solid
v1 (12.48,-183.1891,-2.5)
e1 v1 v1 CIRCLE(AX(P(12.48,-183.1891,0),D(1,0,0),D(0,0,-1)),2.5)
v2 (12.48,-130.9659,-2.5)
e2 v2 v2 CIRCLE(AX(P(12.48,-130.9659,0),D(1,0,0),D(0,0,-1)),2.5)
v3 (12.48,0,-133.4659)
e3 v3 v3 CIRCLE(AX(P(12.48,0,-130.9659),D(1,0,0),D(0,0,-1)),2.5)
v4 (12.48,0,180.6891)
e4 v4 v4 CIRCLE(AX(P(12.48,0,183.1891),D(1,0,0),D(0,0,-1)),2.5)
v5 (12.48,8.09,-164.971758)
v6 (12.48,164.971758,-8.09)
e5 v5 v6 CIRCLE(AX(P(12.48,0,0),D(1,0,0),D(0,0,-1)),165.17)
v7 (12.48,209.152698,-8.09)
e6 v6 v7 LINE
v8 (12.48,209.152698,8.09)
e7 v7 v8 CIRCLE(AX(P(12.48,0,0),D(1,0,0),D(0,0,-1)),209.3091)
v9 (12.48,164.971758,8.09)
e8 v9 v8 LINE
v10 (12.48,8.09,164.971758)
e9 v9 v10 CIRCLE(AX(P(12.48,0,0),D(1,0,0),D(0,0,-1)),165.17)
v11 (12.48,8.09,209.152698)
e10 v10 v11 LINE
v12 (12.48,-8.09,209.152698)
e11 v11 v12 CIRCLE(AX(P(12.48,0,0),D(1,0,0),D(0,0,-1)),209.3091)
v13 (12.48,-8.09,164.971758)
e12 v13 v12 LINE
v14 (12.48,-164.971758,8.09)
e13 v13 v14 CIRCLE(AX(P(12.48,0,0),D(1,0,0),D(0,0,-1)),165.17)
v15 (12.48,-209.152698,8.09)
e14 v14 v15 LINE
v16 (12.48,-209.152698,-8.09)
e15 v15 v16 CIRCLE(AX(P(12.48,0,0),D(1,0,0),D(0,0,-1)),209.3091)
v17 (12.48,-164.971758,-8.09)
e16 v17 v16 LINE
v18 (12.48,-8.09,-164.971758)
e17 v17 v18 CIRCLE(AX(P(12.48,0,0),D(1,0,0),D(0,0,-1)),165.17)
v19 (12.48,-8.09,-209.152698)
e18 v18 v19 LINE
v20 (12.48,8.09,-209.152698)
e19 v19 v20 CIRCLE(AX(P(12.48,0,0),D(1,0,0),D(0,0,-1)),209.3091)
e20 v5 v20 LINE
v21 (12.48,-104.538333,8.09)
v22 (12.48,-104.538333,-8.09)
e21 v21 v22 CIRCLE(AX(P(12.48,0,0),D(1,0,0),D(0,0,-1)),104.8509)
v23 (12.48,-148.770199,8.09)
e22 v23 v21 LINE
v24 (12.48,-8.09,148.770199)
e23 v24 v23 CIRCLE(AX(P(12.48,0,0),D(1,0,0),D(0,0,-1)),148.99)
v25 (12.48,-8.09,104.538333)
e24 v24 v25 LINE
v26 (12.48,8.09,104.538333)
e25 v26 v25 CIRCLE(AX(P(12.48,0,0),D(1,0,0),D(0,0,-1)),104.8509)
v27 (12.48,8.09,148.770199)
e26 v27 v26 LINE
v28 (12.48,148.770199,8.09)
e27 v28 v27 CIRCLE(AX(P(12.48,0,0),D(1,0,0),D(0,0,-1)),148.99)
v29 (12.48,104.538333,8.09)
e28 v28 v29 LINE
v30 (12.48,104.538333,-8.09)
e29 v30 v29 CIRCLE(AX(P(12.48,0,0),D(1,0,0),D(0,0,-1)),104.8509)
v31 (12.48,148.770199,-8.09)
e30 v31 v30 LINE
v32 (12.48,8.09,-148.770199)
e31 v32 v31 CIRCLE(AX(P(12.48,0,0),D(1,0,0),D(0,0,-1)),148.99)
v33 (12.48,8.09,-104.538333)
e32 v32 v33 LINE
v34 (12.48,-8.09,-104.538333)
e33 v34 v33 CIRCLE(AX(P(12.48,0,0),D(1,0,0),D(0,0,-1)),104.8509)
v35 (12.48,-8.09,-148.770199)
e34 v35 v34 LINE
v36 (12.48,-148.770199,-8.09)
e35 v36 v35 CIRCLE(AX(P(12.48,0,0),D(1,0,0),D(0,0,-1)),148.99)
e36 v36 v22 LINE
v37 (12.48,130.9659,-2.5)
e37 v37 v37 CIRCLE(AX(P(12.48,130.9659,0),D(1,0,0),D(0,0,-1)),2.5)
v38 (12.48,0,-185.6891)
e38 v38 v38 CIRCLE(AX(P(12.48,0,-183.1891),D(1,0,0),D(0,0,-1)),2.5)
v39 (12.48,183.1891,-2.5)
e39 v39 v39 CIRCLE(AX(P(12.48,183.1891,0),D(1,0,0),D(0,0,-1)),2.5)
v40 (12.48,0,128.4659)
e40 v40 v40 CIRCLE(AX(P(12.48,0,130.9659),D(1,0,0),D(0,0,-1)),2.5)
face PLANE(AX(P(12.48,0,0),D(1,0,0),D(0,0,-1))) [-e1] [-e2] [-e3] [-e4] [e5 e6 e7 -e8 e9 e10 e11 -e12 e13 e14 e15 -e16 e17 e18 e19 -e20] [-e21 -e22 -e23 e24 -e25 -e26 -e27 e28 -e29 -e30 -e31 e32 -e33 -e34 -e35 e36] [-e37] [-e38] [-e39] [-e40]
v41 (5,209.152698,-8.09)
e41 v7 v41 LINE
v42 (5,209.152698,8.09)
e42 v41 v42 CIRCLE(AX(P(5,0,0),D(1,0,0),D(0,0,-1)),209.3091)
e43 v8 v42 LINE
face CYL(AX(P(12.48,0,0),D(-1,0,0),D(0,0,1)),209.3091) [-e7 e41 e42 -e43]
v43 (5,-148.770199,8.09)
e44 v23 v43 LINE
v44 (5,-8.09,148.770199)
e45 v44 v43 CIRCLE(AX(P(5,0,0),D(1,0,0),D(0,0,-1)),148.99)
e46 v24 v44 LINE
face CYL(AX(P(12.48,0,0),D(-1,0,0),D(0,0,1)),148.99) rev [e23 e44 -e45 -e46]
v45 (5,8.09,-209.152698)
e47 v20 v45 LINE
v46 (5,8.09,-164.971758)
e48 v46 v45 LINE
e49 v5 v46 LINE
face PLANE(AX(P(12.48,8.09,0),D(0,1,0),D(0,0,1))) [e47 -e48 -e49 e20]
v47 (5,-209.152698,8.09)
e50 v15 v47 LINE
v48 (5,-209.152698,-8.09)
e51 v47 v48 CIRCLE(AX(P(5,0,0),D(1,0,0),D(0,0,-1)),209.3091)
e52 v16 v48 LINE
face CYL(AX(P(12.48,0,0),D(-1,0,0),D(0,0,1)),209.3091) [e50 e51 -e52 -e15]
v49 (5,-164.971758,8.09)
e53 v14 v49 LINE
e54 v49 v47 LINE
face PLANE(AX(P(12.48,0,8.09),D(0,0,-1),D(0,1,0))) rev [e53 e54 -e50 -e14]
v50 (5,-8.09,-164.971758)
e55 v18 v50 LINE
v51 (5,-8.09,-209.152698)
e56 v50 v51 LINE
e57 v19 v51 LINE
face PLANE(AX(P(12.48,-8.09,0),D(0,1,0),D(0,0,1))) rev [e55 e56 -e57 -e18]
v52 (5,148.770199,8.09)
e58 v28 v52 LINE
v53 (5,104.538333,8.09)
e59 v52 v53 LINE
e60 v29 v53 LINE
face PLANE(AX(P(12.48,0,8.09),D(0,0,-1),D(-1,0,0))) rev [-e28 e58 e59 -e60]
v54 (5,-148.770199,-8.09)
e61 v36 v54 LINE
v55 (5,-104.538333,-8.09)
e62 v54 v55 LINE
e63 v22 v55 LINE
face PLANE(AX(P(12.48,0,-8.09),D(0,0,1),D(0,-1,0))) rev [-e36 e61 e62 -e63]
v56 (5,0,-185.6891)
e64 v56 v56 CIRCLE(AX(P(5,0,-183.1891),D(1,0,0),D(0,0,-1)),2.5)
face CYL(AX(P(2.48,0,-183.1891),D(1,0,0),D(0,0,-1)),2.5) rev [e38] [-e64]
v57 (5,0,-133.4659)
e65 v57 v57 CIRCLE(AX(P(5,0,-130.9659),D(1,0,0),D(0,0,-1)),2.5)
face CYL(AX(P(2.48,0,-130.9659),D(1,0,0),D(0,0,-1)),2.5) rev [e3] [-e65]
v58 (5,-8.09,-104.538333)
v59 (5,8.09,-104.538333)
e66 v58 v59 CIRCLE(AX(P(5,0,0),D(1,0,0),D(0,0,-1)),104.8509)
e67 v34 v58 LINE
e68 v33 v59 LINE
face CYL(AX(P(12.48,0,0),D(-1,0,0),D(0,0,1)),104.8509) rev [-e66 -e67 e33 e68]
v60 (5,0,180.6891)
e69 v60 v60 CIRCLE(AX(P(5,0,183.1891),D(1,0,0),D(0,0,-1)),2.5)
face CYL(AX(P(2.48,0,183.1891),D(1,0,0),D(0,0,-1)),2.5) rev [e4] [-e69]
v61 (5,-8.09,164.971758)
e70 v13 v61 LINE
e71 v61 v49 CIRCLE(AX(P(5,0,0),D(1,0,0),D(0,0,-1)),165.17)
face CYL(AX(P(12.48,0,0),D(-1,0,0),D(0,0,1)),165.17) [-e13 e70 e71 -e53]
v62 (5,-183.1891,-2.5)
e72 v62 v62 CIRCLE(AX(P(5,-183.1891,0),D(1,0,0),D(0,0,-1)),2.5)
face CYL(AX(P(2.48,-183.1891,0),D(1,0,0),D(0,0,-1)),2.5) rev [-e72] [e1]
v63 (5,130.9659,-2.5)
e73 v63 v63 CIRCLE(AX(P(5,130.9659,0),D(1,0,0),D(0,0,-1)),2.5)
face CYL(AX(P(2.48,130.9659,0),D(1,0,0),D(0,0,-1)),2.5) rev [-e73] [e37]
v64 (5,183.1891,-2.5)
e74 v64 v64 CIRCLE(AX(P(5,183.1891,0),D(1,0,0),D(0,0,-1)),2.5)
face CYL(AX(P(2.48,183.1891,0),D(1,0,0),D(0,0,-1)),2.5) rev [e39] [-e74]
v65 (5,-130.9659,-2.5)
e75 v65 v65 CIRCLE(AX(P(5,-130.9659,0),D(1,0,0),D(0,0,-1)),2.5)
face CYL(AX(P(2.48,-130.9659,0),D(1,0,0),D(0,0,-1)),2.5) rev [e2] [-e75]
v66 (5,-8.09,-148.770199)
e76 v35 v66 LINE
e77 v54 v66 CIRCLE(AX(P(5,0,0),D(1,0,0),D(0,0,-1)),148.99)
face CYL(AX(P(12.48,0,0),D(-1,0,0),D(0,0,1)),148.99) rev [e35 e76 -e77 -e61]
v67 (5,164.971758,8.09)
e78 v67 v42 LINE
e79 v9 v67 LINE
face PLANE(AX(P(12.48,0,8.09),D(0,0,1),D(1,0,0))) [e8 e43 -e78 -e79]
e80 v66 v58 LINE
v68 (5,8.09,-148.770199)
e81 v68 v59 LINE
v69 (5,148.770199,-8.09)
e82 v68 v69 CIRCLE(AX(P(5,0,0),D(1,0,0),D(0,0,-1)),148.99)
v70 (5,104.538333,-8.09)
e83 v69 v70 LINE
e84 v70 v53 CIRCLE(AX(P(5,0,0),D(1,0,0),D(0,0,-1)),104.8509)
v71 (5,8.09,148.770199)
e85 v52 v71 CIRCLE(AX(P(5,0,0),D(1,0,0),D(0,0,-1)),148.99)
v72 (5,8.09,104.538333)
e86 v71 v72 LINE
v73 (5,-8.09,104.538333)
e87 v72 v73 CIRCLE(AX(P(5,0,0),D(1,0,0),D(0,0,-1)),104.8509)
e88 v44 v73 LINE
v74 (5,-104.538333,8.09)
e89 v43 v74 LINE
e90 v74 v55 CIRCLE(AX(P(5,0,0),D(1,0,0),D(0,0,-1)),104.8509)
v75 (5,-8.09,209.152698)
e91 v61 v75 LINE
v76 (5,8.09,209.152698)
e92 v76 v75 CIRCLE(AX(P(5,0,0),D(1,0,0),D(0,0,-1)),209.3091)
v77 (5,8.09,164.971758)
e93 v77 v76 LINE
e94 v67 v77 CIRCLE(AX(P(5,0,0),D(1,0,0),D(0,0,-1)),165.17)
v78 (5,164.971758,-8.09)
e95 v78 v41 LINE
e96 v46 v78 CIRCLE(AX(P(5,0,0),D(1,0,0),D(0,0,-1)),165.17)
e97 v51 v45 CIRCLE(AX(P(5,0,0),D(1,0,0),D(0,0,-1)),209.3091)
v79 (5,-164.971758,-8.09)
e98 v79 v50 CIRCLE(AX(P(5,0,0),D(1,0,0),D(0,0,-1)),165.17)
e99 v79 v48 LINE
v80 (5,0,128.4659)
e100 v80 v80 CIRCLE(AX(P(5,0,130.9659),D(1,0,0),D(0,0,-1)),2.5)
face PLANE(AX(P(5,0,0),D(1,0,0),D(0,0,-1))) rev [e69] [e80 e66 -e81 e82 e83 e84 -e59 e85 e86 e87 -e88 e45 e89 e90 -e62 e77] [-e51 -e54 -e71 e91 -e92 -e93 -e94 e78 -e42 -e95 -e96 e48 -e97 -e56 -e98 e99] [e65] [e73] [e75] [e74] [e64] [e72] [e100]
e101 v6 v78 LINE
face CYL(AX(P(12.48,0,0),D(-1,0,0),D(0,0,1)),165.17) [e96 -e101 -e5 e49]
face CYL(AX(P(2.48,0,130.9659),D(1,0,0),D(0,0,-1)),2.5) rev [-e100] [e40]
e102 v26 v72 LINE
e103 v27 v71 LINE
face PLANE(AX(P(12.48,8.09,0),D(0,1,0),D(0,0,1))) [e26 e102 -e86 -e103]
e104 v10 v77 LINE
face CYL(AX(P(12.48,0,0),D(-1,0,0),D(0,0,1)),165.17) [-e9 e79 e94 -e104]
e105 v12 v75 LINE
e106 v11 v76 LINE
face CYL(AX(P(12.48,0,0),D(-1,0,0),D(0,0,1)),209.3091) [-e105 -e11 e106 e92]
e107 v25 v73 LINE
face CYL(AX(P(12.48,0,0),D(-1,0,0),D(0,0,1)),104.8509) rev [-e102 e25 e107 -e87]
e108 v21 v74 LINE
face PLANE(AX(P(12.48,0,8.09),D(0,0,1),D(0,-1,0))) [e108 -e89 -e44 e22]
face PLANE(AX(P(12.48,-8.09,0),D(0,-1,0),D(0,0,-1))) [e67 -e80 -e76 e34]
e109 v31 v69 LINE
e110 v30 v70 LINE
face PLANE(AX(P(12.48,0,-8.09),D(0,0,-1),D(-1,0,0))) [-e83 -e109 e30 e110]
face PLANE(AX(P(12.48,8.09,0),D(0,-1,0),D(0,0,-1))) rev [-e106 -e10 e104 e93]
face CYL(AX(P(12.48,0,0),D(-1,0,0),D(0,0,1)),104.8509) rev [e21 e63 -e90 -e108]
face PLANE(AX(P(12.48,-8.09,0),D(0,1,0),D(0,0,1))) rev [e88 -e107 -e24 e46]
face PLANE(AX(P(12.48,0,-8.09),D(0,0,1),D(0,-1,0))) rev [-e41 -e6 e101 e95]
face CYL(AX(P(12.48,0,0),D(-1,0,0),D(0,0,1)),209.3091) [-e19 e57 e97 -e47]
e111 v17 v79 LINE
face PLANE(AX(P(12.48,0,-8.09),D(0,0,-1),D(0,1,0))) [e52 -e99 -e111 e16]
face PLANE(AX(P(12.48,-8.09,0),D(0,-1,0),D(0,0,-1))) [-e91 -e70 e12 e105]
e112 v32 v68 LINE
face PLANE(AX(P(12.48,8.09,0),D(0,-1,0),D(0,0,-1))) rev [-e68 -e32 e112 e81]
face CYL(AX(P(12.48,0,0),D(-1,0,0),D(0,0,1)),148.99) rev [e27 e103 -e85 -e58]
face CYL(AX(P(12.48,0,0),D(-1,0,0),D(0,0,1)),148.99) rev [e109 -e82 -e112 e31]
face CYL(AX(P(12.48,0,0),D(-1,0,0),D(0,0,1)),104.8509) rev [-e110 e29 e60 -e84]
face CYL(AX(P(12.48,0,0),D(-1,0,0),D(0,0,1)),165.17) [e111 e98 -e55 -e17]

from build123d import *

# Parameters (mm, degrees)
SKETCH1_W           = 450
SKETCH1_H           = 450
BOSS_EXTRUDE1_DEPTH = 5
BOSS_EXTRUDE2_DEPTH = 7.48
BOSS_EXTRUDE3_DEPTH = 7.48
SKETCH6_W           = 450
SKETCH6_H           = 450
CUT_EXTRUDE1_DEPTH  = 5
SKETCH7_R           = 11
SKETCH7_R_2         = 2.5
CUT_EXTRUDE2_DEPTH  = 10
SKETCH8_R           = 2.5
CUT_EXTRUDE4_DEPTH  = 10


# Read off the part's stored shape, not the designer's step: Boss-Extrude2
with BuildPart() as part:
    # Sketch1 → Boss-Extrude1 (new body)
    with BuildSketch(Plane(origin=(0, 0, 0), x_dir=(0, 0, -1), z_dir=(1, 0, 0))):
        Rectangle(SKETCH1_W, SKETCH1_H)
    extrude(amount=BOSS_EXTRUDE1_DEPTH)

    # Boss-Extrude2 outline → Boss-Extrude2 (add)
    with BuildSketch(Plane(origin=(5, 0, 0), x_dir=(0, 0, -1), z_dir=(1, 0, 0))):
        with BuildLine():
            Line((-164.971757583, 8.09), (-209.152698388, 8.09))
            ThreePointArc((-209.152698388, 8.09), (-209.3091, 0), (-209.152698388, -8.09))
            Line((-209.152698388, -8.09), (-164.971757583, -8.09))
            ThreePointArc((-164.971757583, -8.09), (-116.792827049, -116.792827049), (-8.09, -164.971757583))
            Line((-8.09, -164.971757583), (-8.09, -209.152698388))
            ThreePointArc((-8.09, -209.152698388), (0, -209.3091), (8.09, -209.152698388))
            Line((8.09, -209.152698388), (8.09, -164.971757583))
            ThreePointArc((8.09, -164.971757583), (116.792827049, -116.792827049), (164.971757583, -8.09))
            Line((164.971757583, -8.09), (209.152698388, -8.09))
            ThreePointArc((209.152698388, -8.09), (209.3091, 0), (209.152698388, 8.09))
            Line((209.152698388, 8.09), (164.971757583, 8.09))
            ThreePointArc((164.971757583, 8.09), (116.792827049, 116.792827049), (8.09, 164.971757583))
            Line((8.09, 164.971757583), (8.09, 209.152698388))
            ThreePointArc((8.09, 209.152698388), (0, 209.3091), (-8.09, 209.152698388))
            Line((-8.09, 209.152698388), (-8.09, 164.971757583))
            ThreePointArc((-8.09, 164.971757583), (-116.792827049, 116.792827049), (-164.971757583, 8.09))
        make_face()
        with BuildLine():
            Line((148.770198629, 8.09), (104.538333308, 8.09))
            ThreePointArc((104.538333308, 8.09), (104.8509, 0), (104.538333308, -8.09))
            Line((104.538333308, -8.09), (148.770198629, -8.09))
            ThreePointArc((148.770198629, -8.09), (105.351839329, -105.351839329), (8.09, -148.770198629))
            Line((8.09, -148.770198629), (8.09, -104.538333308))
            ThreePointArc((8.09, -104.538333308), (0, -104.8509), (-8.09, -104.538333308))
            Line((-8.09, -104.538333308), (-8.09, -148.770198629))
            ThreePointArc((-8.09, -148.770198629), (-105.351839329, -105.351839329), (-148.770198629, -8.09))
            Line((-148.770198629, -8.09), (-104.538333308, -8.09))
            ThreePointArc((-104.538333308, -8.09), (-104.8509, 0), (-104.538333308, 8.09))
            Line((-104.538333308, 8.09), (-148.770198629, 8.09))
            ThreePointArc((-148.770198629, 8.09), (-105.351839329, 105.351839329), (-8.09, 148.770198629))
            Line((-8.09, 148.770198629), (-8.09, 104.538333308))
            ThreePointArc((-8.09, 104.538333308), (0, 104.8509), (8.09, 104.538333308))
            Line((8.09, 104.538333308), (8.09, 148.770198629))
            ThreePointArc((8.09, 148.770198629), (105.351839329, 105.351839329), (148.770198629, 8.09))
        make_face(mode=Mode.SUBTRACT)
    extrude(amount=BOSS_EXTRUDE2_DEPTH)

    # Sketch5 → Boss-Extrude3 (add)
    with BuildSketch(Plane(origin=(5, 0, 0), x_dir=(0, 0, -1), z_dir=(1, 0, 0))):
        with BuildLine():
            Line((-19.319547743, 8.09), (-104.275748565, 8.09))
            ThreePointArc((-104.275748565, 8.09), (-104.5891, 0), (-104.275748565, -8.09))
            Line((-104.275748565, -8.09), (-19.319547743, -8.09))
            ThreePointArc((-19.319547743, -8.09), (0, -20.945), (19.319547743, -8.09))
            Line((19.319547743, -8.09), (104.275748565, -8.09))
            ThreePointArc((104.275748565, -8.09), (104.5891, 0), (104.275748565, 8.09))
            Line((104.275748565, 8.09), (19.319547743, 8.09))
            ThreePointArc((19.319547743, 8.09), (0, 20.945), (-19.319547743, 8.09))
        make_face()
    extrude(amount=BOSS_EXTRUDE3_DEPTH)

    # Sketch6 → Cut-Extrude1 (cut)
    with BuildSketch(Plane.ZY):
        Rectangle(SKETCH6_W, SKETCH6_H)
    extrude(amount=-CUT_EXTRUDE1_DEPTH, mode=Mode.SUBTRACT)


with BuildPart() as cut_extrude1_piece_1:
    # of the separate pieces the step leaves, piece 1, a body of its own (cut_extrude1_pieces)
    add(part.part.solids().sort_by_distance((5, 209.152698388, 8.09))[0])


with BuildPart() as cut_extrude1_piece_2:
    # of the separate pieces the step leaves, piece 2, a body of its own (cut_extrude1_pieces)
    add(part.part.solids().sort_by_distance((5, 8.09, -104.275748565))[0])


with BuildPart() as cut_extrude2_tool:
    # Sketch7 → Cut-Extrude2 (new body)
    with BuildSketch(Plane(origin=(12.48, 0, 0), x_dir=(0, 0, -1), z_dir=(1, 0, 0))):
        Circle(SKETCH7_R)
        with Locations((-183.1891, 0)):
            Circle(SKETCH7_R_2)
        with Locations((-130.9659, 0)):
            Circle(SKETCH7_R_2)
        with Locations((0, -183.1891)):
            Circle(SKETCH7_R_2)
        with Locations((0, -130.9659)):
            Circle(SKETCH7_R_2)
        with Locations((183.1891, 0)):
            Circle(SKETCH7_R_2)
        with Locations((52.3, 0)):
            Circle(SKETCH7_R_2)
        with Locations((-52.295, 0)):
            Circle(SKETCH7_R_2)
        with Locations((0, 183.1891)):
            Circle(SKETCH7_R_2)
        with Locations((0, 130.9659)):
            Circle(SKETCH7_R_2)
        with BuildLine():
            Line((-3, 13.8), (-3, 10.583005244))
            ThreePointArc((-3, 10.583005244), (0, 11), (3, 10.583005244))
            Line((3, 10.583005244), (3, 13.8))
            Line((3, 13.8), (-3, 13.8))
        make_face()
        with Locations((130.9659, 0)):
            Circle(SKETCH7_R_2)
    extrude(amount=-CUT_EXTRUDE2_DEPTH)


with BuildPart() as cut_extrude1_piece_1_1:
    add(cut_extrude1_piece_1.part)

    # Cut-Extrude2: cut by cut_extrude2_tool
    add(cut_extrude2_tool.part, mode=Mode.SUBTRACT)


with BuildPart() as cut_extrude1_piece_2_1:
    add(cut_extrude1_piece_2.part)

    # Cut-Extrude2: cut by cut_extrude2_tool
    add(cut_extrude2_tool.part, mode=Mode.SUBTRACT)

    # Sketch8 → Cut-Extrude4 (cut)
    with BuildSketch(Plane(origin=(12.48, 0, 0), x_dir=(0, 0, -1), z_dir=(1, 0, 0))):
        with BuildLine():
            ThreePointArc((19.319547743, 8.09), (0, 20.945), (-19.319547743, 8.09))
            Line((-19.319547743, 8.09), (-104.275748565, 8.09))
            ThreePointArc((-104.275748565, 8.09), (-104.5891, 0), (-104.275748565, -8.09))
            Line((-104.275748565, -8.09), (-19.319547743, -8.09))
            ThreePointArc((-19.319547743, -8.09), (0, -20.945), (19.319547743, -8.09))
            Line((19.319547743, -8.09), (104.275748565, -8.09))
            ThreePointArc((104.275748565, -8.09), (104.5891, 0), (104.275748565, 8.09))
            Line((104.275748565, 8.09), (19.319547743, 8.09))
        make_face()
        with Locations((-52.295, 0)):
            Circle(SKETCH8_R, mode=Mode.SUBTRACT)
        with Locations((52.3, 0)):
            Circle(SKETCH8_R, mode=Mode.SUBTRACT)
        with BuildLine():
            Line((3, 13.8), (3, 10.583005244))
            ThreePointArc((3, 10.583005244), (0, -11), (-3, 10.583005244))
            Line((-3, 10.583005244), (-3, 13.8))
            Line((-3, 13.8), (3, 13.8))
        make_face(mode=Mode.SUBTRACT)
    extrude(amount=-CUT_EXTRUDE4_DEPTH, mode=Mode.SUBTRACT)


solid = cut_extrude1_piece_1_1.part
